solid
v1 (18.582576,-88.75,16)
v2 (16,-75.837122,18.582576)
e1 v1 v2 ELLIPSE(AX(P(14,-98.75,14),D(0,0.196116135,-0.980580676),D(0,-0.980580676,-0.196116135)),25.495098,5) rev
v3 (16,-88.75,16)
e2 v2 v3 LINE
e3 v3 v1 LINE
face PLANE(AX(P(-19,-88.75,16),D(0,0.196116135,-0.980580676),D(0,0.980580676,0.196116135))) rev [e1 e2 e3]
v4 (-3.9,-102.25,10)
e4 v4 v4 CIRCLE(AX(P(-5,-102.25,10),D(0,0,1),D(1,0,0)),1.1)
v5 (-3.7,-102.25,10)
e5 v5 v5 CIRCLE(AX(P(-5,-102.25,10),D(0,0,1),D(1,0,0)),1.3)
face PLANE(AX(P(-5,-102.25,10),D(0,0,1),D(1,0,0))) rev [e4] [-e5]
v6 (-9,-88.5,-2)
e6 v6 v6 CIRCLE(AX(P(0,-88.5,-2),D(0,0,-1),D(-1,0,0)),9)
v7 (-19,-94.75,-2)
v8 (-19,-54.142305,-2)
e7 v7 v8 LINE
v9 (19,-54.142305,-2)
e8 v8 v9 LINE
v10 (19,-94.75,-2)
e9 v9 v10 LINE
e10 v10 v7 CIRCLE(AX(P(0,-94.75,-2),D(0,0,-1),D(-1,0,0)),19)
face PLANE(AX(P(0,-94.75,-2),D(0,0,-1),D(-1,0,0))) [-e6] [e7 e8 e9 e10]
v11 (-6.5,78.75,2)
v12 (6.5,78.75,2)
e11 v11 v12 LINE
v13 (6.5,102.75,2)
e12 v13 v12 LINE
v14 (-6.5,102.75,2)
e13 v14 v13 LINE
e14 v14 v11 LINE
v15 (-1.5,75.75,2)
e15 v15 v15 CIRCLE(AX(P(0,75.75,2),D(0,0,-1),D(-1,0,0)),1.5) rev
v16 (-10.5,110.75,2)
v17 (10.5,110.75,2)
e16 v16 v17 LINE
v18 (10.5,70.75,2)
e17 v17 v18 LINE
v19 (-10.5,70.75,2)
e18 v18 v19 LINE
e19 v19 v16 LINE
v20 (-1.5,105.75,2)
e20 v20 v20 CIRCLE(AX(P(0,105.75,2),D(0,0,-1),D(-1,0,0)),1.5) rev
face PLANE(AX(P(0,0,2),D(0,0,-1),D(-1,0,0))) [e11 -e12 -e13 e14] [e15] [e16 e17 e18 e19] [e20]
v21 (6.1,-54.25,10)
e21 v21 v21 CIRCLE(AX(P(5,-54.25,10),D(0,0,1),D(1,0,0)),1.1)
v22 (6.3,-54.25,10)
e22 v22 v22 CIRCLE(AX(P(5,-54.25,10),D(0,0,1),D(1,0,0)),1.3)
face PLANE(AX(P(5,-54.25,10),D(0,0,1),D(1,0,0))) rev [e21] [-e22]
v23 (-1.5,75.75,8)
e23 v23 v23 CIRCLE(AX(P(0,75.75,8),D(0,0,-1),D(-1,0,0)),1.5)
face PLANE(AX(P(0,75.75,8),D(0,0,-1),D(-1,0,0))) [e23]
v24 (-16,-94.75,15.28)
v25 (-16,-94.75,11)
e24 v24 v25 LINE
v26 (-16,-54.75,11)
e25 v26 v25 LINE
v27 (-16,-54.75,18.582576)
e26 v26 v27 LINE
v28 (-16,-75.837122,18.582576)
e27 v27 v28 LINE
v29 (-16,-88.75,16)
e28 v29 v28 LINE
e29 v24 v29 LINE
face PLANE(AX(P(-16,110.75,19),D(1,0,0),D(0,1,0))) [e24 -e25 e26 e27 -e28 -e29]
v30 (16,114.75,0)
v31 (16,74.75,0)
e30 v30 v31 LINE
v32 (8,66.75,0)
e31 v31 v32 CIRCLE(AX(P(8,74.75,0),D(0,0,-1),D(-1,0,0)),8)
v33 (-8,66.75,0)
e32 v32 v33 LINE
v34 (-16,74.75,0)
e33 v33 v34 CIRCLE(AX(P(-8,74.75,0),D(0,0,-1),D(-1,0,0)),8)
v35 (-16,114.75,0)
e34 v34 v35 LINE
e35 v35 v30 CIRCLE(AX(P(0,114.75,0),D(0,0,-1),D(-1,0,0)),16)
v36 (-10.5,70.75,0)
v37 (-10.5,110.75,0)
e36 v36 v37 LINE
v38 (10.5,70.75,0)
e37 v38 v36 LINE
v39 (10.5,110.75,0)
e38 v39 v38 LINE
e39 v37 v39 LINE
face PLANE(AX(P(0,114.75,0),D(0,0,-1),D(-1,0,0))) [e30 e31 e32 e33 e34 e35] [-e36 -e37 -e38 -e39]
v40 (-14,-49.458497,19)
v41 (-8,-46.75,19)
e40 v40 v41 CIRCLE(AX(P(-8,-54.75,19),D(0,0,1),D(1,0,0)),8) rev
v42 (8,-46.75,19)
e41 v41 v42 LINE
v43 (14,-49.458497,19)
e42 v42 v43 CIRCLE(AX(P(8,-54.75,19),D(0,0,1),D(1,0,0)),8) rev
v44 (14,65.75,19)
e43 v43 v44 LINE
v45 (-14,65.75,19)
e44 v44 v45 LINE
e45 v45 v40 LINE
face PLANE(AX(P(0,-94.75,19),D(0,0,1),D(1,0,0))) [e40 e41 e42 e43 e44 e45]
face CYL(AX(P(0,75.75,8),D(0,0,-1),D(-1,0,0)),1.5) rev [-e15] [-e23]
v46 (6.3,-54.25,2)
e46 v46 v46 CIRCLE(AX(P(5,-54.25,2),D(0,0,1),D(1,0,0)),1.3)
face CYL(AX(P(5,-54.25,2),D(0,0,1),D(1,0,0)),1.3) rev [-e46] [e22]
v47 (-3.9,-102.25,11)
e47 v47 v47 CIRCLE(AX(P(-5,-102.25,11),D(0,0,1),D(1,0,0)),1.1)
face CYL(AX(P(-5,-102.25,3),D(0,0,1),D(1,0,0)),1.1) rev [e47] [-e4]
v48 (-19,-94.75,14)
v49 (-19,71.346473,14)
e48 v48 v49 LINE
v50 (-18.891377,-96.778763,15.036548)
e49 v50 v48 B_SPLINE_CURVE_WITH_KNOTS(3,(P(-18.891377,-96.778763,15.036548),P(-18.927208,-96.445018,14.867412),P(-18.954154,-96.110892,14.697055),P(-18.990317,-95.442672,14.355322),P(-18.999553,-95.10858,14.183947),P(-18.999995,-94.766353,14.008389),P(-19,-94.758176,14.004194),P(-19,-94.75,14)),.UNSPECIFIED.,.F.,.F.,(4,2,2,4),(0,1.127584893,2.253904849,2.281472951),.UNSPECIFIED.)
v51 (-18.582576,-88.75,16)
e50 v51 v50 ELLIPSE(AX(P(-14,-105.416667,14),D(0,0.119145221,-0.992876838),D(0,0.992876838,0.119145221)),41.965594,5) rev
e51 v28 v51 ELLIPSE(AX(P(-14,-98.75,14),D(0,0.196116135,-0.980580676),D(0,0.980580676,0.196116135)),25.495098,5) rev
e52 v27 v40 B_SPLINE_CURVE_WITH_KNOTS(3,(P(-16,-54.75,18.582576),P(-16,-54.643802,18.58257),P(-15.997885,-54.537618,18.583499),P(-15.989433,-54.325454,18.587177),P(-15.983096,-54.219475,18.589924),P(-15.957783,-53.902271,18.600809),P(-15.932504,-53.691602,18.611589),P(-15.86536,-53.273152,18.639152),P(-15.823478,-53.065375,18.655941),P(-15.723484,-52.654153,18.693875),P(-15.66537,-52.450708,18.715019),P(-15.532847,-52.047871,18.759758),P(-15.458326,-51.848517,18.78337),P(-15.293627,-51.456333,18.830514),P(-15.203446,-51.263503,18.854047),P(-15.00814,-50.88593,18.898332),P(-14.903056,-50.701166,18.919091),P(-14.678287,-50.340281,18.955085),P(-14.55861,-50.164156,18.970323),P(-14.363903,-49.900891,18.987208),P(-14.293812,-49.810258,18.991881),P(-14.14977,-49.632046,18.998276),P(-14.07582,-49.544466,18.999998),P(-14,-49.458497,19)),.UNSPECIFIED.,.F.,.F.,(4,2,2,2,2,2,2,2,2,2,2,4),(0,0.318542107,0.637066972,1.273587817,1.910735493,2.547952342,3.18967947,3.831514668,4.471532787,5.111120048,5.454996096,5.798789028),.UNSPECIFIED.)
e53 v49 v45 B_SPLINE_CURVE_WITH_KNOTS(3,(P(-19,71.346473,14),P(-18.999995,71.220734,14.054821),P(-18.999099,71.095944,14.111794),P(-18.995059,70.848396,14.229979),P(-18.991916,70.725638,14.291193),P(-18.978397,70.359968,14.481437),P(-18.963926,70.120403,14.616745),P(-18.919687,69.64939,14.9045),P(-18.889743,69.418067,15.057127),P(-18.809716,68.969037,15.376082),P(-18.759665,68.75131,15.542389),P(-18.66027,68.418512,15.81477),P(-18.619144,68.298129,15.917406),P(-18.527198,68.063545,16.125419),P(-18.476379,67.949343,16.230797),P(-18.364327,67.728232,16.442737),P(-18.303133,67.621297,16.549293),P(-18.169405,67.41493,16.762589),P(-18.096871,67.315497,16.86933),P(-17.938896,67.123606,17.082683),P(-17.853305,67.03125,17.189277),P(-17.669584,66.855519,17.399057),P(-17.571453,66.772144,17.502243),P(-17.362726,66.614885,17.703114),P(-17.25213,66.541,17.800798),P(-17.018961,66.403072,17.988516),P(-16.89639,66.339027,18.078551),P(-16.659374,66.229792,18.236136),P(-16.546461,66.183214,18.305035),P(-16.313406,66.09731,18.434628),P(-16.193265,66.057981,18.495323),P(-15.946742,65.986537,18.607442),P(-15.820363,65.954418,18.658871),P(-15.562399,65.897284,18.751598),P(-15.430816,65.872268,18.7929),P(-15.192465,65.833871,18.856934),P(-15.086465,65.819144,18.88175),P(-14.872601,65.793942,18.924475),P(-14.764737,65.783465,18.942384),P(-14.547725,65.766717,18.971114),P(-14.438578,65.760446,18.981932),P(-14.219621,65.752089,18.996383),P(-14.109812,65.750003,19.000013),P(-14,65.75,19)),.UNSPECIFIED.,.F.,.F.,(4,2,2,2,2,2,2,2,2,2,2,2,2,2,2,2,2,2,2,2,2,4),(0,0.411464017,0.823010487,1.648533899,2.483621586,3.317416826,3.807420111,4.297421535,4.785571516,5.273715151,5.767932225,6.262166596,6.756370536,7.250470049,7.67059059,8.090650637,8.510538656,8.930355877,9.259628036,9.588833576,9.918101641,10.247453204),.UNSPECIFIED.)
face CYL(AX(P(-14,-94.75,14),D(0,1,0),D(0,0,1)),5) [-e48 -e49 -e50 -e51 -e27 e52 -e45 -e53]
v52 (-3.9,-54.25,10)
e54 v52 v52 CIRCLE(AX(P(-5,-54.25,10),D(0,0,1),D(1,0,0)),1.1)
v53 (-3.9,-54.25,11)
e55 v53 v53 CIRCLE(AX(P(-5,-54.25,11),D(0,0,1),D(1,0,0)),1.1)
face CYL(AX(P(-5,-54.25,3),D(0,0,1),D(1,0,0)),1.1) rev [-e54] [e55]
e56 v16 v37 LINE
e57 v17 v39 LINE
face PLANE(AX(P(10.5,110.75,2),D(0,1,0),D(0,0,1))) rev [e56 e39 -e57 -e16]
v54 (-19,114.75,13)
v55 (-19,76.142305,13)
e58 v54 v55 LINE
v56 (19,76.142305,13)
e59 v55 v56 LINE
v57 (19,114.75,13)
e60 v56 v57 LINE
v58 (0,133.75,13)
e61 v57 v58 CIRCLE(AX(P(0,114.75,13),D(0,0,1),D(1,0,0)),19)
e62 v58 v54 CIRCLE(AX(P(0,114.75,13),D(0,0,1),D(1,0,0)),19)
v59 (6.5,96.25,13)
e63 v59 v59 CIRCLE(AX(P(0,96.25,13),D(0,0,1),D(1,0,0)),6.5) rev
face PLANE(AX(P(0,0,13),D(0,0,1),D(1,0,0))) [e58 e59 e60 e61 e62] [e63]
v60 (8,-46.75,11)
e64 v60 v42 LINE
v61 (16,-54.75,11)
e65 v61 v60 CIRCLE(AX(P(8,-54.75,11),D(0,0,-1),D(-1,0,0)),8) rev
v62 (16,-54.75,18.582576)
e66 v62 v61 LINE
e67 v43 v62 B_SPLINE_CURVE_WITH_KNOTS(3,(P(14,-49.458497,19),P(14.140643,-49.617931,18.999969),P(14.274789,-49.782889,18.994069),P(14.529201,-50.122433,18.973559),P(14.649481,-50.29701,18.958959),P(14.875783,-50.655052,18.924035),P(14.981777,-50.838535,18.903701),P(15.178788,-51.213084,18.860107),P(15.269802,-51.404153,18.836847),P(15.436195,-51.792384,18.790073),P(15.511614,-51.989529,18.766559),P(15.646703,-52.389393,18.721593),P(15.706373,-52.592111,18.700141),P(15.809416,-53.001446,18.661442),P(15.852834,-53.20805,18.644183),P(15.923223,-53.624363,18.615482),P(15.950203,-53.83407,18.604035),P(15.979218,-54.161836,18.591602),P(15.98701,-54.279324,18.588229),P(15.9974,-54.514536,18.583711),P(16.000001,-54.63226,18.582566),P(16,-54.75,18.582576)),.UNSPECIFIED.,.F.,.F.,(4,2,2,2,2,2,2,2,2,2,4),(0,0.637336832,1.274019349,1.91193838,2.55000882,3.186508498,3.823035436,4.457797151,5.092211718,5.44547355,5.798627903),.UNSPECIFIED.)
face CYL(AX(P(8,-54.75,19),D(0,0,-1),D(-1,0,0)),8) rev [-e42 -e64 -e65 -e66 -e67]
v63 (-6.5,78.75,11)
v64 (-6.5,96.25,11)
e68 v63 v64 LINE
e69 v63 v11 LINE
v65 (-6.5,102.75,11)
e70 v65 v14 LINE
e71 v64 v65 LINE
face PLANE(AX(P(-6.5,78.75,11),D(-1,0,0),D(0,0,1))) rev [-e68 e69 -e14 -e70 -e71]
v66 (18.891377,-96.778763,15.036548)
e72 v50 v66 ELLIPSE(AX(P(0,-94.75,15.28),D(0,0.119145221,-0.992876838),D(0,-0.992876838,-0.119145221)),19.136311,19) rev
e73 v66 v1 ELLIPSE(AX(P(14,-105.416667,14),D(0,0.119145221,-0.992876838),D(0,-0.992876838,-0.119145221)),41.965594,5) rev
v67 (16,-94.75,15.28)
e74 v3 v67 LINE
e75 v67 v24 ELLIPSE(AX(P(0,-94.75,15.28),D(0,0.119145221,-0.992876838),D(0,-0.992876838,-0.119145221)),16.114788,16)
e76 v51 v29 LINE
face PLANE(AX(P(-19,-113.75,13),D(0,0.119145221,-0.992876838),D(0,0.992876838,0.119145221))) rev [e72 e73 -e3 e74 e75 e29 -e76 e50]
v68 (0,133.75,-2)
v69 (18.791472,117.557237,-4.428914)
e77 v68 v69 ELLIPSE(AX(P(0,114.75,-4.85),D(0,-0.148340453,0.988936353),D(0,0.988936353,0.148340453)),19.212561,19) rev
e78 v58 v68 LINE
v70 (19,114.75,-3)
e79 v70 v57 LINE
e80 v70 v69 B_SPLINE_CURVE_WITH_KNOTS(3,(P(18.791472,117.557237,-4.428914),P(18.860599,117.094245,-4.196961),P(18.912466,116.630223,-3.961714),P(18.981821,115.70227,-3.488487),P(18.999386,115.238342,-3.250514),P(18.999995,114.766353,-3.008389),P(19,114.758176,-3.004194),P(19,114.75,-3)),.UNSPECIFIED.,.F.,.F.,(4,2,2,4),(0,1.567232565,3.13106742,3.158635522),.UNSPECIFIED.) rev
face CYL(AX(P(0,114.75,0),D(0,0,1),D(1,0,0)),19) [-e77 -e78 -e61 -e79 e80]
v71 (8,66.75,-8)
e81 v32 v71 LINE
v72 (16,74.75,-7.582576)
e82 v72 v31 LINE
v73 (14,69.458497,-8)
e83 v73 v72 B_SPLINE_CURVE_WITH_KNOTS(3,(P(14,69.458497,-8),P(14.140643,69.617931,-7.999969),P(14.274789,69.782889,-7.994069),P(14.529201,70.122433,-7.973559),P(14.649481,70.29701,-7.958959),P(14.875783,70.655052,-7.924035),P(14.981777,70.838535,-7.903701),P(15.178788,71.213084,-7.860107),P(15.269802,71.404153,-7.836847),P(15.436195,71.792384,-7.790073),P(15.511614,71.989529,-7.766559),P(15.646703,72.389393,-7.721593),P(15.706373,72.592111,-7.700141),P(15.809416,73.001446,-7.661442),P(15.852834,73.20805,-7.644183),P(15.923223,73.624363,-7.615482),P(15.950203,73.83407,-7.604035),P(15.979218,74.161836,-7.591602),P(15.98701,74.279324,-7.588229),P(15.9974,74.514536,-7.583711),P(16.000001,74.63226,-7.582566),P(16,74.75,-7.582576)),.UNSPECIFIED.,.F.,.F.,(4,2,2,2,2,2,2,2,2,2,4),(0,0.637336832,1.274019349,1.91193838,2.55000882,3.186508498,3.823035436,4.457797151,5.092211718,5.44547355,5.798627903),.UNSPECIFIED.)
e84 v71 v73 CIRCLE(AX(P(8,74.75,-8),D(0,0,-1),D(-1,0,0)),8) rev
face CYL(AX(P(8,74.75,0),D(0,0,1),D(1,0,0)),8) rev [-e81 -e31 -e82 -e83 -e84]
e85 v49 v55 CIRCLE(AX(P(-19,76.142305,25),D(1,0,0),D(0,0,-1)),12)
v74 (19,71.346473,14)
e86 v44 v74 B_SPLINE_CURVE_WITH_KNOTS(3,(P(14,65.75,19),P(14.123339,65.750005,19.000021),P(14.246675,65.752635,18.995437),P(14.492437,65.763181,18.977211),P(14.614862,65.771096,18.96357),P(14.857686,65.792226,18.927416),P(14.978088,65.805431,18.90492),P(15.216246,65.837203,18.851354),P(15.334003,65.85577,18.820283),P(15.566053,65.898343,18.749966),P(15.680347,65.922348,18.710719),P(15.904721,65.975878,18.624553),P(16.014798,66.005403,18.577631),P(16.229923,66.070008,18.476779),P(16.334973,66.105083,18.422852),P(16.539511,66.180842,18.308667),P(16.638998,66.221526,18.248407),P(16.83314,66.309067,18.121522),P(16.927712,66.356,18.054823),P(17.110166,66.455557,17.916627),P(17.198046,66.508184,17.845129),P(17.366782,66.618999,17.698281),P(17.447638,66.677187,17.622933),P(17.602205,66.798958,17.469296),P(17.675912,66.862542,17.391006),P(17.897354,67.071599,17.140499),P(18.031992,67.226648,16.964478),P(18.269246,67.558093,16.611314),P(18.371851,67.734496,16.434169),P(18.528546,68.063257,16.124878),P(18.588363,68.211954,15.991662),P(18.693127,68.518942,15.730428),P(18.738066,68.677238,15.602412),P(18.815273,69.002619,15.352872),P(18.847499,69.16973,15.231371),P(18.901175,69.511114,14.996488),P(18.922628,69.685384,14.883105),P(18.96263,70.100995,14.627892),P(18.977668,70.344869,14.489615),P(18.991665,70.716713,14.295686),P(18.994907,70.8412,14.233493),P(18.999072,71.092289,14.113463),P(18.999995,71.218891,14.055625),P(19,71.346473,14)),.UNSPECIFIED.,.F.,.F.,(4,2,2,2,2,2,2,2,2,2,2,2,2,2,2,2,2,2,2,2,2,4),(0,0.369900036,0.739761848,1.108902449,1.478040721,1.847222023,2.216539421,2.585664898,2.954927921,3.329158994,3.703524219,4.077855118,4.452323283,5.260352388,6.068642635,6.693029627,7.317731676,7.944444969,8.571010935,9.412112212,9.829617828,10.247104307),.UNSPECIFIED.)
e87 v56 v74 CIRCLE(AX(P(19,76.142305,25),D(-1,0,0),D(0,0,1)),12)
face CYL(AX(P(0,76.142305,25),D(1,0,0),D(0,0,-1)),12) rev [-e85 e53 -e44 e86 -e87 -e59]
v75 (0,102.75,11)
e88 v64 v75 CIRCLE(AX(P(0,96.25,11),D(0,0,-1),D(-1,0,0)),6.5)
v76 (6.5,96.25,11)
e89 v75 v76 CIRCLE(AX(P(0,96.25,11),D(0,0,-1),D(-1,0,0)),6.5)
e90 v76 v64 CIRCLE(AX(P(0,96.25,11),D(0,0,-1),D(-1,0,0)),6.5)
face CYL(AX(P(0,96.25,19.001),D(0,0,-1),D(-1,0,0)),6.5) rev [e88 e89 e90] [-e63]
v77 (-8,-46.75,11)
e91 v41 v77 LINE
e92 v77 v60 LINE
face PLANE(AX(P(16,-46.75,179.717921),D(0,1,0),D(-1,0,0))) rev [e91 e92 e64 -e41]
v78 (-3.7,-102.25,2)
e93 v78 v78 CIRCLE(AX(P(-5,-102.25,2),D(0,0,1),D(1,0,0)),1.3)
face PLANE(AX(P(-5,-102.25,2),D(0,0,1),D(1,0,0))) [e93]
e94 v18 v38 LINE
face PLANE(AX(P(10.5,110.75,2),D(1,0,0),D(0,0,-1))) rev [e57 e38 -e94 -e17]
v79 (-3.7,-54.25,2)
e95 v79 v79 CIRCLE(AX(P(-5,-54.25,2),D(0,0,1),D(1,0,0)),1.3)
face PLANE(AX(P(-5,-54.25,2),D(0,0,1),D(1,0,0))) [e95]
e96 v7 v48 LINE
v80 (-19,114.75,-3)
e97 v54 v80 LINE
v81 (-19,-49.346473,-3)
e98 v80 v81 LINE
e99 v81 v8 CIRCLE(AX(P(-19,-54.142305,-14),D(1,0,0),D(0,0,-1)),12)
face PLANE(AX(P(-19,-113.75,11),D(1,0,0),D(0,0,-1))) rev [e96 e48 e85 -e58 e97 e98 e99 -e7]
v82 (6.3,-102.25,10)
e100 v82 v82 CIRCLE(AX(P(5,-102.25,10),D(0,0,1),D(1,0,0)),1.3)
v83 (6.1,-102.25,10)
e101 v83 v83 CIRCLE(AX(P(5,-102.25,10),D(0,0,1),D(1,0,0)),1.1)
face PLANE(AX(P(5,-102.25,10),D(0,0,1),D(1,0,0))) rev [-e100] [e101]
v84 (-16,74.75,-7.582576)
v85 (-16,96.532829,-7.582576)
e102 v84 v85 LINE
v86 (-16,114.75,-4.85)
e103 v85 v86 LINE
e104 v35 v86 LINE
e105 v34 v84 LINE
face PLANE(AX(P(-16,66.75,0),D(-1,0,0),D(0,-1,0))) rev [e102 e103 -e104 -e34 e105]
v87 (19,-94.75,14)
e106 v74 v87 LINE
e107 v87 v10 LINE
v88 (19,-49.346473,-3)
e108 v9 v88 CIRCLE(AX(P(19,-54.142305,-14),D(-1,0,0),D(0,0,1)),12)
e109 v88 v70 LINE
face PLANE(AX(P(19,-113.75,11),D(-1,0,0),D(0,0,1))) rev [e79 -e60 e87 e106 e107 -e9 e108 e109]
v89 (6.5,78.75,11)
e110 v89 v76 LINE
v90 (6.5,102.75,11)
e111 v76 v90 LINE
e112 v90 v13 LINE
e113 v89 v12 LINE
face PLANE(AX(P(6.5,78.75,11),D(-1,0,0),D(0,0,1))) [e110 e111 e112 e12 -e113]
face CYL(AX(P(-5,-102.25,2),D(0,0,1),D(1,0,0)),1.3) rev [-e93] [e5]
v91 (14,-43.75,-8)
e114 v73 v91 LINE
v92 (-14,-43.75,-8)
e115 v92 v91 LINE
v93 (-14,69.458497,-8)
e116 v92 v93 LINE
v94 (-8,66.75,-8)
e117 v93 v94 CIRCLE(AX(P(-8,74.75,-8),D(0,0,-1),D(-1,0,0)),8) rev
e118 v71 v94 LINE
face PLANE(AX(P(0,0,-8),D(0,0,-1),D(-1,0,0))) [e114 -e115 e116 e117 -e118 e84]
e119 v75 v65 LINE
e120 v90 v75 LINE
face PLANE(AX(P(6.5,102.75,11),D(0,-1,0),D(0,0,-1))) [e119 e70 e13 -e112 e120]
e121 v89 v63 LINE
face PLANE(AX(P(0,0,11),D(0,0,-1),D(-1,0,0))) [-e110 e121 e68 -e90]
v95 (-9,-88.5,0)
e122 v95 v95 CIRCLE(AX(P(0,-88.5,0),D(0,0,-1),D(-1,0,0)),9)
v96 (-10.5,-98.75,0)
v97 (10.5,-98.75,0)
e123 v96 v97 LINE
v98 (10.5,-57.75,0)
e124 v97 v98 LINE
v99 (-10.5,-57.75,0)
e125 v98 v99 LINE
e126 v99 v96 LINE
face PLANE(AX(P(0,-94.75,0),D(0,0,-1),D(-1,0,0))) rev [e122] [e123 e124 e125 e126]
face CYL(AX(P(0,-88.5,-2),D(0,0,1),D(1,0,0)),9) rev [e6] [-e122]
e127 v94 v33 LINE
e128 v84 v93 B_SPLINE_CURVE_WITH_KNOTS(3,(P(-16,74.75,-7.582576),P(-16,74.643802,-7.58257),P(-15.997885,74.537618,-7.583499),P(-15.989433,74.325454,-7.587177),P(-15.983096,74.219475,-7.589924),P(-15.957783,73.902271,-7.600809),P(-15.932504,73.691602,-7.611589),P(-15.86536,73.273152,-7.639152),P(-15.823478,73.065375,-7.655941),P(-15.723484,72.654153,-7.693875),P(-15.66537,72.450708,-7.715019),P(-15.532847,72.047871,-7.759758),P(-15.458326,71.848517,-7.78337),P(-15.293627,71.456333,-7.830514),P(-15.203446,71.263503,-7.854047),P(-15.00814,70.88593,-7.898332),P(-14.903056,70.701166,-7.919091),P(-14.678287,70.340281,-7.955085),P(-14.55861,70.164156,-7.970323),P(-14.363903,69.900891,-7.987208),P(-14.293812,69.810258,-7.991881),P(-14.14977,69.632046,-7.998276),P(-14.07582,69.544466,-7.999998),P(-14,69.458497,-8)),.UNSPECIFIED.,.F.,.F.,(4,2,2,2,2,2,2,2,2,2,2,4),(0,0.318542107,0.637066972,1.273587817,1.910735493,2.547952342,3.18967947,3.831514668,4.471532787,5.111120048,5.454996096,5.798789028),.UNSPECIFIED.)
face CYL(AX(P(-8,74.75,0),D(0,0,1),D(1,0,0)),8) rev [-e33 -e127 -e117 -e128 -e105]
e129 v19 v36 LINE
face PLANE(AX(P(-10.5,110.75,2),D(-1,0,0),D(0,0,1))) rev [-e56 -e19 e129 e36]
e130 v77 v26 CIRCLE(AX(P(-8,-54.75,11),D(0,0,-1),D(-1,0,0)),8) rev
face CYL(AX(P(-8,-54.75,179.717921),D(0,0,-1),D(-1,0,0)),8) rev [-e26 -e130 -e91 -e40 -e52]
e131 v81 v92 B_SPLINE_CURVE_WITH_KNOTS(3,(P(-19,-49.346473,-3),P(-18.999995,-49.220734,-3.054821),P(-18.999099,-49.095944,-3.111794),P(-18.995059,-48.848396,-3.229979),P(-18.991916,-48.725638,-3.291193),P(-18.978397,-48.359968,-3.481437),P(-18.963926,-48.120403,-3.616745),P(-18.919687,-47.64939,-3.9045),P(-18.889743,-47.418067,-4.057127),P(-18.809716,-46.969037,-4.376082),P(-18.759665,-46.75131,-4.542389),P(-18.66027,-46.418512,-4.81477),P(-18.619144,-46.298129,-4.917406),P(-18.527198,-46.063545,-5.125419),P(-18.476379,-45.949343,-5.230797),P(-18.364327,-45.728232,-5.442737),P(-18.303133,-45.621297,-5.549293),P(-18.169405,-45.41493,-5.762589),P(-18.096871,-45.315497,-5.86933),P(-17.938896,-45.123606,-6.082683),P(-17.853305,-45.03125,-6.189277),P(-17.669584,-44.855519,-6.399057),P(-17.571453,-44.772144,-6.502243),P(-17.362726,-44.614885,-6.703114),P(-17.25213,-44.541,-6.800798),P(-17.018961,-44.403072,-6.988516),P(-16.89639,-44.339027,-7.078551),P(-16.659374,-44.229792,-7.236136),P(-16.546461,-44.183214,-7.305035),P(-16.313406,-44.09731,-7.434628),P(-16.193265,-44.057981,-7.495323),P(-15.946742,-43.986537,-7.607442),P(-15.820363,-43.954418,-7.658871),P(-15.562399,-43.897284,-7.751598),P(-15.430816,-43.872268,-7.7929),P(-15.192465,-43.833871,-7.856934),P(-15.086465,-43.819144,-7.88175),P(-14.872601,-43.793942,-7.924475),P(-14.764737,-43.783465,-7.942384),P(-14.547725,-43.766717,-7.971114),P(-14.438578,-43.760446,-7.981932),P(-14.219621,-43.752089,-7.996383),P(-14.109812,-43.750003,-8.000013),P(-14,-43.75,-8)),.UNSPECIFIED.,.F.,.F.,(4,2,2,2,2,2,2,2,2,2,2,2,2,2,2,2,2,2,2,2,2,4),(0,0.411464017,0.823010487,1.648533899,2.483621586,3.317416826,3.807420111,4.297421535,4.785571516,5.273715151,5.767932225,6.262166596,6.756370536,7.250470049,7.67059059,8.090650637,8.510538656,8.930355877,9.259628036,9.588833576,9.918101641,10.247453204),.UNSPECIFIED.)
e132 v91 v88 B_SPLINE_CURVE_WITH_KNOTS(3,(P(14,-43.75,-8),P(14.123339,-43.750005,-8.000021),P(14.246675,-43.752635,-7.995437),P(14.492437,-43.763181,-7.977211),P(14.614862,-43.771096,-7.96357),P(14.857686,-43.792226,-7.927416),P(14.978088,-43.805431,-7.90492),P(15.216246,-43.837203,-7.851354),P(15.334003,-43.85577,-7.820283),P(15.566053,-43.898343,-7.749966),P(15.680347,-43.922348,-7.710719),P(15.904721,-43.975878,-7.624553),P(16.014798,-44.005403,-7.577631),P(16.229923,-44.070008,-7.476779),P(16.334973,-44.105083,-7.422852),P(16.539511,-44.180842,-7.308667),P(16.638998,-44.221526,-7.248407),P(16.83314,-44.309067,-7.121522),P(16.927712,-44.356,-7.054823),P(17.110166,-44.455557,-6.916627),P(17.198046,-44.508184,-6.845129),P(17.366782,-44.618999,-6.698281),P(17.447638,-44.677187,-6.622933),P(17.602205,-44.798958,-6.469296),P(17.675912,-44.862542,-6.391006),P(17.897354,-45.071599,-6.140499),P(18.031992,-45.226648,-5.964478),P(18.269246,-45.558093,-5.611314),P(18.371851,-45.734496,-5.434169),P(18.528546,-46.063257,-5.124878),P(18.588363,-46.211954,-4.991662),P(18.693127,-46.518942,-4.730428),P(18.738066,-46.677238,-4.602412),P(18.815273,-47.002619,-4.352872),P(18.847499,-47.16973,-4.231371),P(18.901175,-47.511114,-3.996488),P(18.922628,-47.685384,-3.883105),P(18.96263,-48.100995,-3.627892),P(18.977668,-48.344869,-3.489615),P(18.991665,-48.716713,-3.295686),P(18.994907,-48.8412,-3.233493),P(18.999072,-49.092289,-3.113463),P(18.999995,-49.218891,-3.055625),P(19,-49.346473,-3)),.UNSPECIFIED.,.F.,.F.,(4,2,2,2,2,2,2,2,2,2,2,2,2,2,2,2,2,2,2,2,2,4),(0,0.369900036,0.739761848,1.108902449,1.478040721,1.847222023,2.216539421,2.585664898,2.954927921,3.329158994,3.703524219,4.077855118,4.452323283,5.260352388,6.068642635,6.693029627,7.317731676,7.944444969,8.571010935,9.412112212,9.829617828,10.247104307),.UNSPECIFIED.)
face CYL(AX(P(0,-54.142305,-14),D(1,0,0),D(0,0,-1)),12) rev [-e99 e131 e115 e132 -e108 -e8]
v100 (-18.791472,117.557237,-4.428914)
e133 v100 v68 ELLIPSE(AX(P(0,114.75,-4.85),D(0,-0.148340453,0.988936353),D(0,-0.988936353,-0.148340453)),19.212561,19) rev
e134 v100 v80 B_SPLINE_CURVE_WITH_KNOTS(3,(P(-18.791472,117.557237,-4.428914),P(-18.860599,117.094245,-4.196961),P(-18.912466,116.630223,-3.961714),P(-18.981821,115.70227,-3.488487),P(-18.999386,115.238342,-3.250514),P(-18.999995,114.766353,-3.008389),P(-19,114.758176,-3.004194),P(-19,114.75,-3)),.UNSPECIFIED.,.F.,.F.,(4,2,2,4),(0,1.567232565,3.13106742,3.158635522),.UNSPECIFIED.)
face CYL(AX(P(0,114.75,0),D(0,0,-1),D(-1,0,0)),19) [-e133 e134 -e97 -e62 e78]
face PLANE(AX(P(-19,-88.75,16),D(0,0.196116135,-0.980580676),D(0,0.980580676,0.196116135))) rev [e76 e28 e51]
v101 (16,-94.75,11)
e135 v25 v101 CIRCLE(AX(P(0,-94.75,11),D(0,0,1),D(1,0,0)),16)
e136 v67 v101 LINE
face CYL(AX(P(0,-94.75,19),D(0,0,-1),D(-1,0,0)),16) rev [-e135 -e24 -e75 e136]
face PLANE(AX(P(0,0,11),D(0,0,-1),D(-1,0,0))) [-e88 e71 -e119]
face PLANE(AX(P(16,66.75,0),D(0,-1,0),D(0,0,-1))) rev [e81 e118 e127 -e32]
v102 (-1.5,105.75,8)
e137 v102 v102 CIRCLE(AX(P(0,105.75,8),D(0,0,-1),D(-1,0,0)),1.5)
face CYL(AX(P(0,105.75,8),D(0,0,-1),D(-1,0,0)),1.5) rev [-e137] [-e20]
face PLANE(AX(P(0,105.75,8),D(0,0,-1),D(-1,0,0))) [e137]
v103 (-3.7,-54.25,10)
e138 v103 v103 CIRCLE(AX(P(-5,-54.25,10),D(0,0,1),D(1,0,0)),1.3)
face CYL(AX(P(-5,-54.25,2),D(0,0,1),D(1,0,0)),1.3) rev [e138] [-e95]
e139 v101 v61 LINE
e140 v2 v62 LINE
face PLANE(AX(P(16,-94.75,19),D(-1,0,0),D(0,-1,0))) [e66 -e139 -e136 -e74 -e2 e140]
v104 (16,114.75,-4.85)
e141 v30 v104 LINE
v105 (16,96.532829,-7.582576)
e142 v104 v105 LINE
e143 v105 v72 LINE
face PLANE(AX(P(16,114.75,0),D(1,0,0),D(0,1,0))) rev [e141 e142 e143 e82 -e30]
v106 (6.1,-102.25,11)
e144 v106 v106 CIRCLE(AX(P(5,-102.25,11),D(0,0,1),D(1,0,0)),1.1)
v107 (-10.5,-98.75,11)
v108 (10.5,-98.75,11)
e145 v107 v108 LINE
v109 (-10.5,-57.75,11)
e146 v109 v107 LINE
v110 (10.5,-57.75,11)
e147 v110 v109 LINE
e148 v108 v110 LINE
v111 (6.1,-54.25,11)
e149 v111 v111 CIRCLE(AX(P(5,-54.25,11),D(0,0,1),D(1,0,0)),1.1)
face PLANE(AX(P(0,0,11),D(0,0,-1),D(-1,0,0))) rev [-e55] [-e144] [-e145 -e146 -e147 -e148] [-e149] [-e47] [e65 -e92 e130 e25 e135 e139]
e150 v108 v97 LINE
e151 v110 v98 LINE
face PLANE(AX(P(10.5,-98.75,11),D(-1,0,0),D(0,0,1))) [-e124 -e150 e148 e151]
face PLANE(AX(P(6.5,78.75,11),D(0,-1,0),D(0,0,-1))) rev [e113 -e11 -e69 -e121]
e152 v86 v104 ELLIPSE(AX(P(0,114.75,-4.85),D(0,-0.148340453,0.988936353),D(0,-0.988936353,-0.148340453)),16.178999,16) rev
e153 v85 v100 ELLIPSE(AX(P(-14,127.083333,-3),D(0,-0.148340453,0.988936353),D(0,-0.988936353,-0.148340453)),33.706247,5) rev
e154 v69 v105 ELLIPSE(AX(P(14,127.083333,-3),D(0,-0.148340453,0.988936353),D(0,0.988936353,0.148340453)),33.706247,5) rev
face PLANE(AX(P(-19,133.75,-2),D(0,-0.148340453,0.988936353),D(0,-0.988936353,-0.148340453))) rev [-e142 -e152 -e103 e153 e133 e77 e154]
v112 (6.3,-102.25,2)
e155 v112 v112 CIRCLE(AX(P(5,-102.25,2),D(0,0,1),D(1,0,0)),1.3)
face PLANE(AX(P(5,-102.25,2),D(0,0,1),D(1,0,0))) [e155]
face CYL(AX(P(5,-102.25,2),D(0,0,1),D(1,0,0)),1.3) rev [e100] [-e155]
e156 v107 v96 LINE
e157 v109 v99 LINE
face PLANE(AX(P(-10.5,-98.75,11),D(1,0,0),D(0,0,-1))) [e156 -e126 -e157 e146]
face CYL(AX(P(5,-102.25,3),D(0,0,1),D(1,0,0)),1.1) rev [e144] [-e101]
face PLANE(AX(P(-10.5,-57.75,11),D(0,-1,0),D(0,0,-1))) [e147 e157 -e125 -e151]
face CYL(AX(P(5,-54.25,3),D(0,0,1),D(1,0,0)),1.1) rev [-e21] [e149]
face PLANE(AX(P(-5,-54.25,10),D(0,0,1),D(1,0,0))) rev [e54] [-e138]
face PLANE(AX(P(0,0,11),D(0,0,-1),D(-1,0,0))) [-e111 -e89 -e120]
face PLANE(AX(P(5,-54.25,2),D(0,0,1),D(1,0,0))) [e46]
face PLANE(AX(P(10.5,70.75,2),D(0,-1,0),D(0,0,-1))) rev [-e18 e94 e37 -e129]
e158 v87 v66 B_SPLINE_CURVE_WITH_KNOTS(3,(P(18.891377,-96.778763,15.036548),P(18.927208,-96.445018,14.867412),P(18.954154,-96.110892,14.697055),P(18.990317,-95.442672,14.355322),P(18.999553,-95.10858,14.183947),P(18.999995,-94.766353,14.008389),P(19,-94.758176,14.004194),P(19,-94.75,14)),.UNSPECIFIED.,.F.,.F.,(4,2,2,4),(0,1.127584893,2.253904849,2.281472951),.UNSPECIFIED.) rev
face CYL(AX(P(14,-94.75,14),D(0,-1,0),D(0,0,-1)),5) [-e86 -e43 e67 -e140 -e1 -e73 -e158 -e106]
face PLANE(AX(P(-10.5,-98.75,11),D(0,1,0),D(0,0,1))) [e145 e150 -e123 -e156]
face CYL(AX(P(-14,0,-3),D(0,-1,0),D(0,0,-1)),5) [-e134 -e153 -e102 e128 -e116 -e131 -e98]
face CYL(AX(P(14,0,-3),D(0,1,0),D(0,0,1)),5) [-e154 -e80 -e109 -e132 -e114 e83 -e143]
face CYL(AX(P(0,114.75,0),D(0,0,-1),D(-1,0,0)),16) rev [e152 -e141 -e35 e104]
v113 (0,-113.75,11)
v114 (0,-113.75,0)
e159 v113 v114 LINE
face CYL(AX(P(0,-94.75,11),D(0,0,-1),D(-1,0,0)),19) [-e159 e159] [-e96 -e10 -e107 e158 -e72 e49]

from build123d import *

# Parameters (mm, degrees)
SKETCH1_W               = 38
SKETCH1_H               = 227.5
SKETCH1_W_2             = 21
SKETCH1_H_2             = 41
BOSS_EXTRUDE1_DEPTH     = 11
SKETCH3_R               = 1.3
CUT_EXTRUDE1_DEPTH      = 8
FILLET3_R               = 19
BOSS_EXTRUDE2_DEPTH     = 8
CUT_EXTRUDE2_DEPTH      = 117.880547997
CUT_EXTRUDE2_DEPTH_BACK = 117.880547997
SKETCH7_W               = 32
SKETCH7_H               = 157.5
BOSS_EXTRUDE4_DEPTH     = 8
SKETCH8_W               = 38
SKETCH8_H               = 157.5
BOSS_EXTRUDE5_DEPTH     = 8
BOSS_EXTRUDE10_START    = 2
SKETCH27_R              = 9
BOSS_EXTRUDE10_DEPTH    = 2
SKETCH28_W              = 38
SKETCH28_H              = 27
BOSS_EXTRUDE11_DEPTH    = 20
FILLET4_R               = 19
CUT_EXTRUDE14_DEPTH     = 8
SKETCH30_W              = 13
SKETCH30_H              = 24
CUT_EXTRUDE15_DEPTH     = 11
CUT_EXTRUDE16_REACH     = 138.422
SKETCH31_R              = 6.5
CUT_EXTRUDE17_START     = 65.75
CUT_EXTRUDE17_OUTLINE_W = 38
CUT_EXTRUDE17_OUTLINE_H = 6
CUT_EXTRUDE17_DEPTH     = 68
FILLET5_R               = 12
CUT_EXTRUDE18_DEPTH     = 141.335535414
FILLET7_R               = 5
SKETCH34_R              = 1.5
CUT_EXTRUDE19_DEPTH     = 8
SKETCH35_R              = 1.1
CUT_EXTRUDE20_DEPTH     = 8
FILLET8_R               = 8
SKETCH36_W              = 21
SKETCH36_H              = 40
CUT_EXTRUDE21_DEPTH     = 2


# Read off the part's stored shape, not the designer's step: Cut-Extrude17
# Some blends are built 0.0001 mm under size
with BuildPart() as part:
    # Sketch1 → Boss-Extrude1 (new body)
    with BuildSketch(Plane.XY):
        Rectangle(SKETCH1_W, SKETCH1_H)
        with Locations((0, -78.25)):
            Rectangle(SKETCH1_W_2, SKETCH1_H_2, mode=Mode.SUBTRACT)
    extrude(amount=BOSS_EXTRUDE1_DEPTH)

    # Sketch3 → Cut-Extrude1 (cut)
    with BuildSketch(Plane.XY.offset(10)):
        with Locations((-5, -54.25)):
            Circle(SKETCH3_R)
        with Locations((5, -54.25)):
            Circle(SKETCH3_R)
        with Locations((5, -102.25)):
            Circle(SKETCH3_R)
        with Locations((-5, -102.25)):
            Circle(SKETCH3_R)
    extrude(amount=-CUT_EXTRUDE1_DEPTH, mode=Mode.SUBTRACT)

    # Fillet3
    fillet3_edges = [part.edges().sort_by_distance(p)[0] for p in [
        (19, -113.75, 5.5),
        (-19, -113.75, 5.5),
    ]]
    fillet(fillet3_edges, radius=FILLET3_R - 0.0001)  # a hair under: the kernel refuses the full size

    # Sketch4 → Boss-Extrude2 (add)
    with BuildSketch(Plane.XY.offset(11)):
        with BuildLine():
            Line((19, -94.75), (19, 113.75))
            Line((19, 113.75), (-19, 113.75))
            Line((-19, 113.75), (-19, -94.75))
            ThreePointArc((-19, -94.75), (-13.435028843, -108.185028843), (0, -113.75))
            ThreePointArc((0, -113.75), (13.435028843, -108.185028843), (19, -94.75))
        make_face()
        with BuildLine():
            Line((16, -94.75), (16, 110.75))
            Line((16, 110.75), (-16, 110.75))
            Line((-16, 110.75), (-16, -94.75))
            ThreePointArc((-16, -94.75), (-11.313708499, -106.063708499), (0, -110.75))
            ThreePointArc((0, -110.75), (11.313708499, -106.063708499), (16, -94.75))
        make_face(mode=Mode.SUBTRACT)
    extrude(amount=BOSS_EXTRUDE2_DEPTH)

    # Sketch6 → Cut-Extrude2 (cut, two sides: drawn at the far end of the back side and taken through both)
    with BuildSketch(Plane(origin=(0, 0, 0), x_dir=(0, 0, -1), z_dir=(1, 0, 0)).offset(-CUT_EXTRUDE2_DEPTH_BACK)):
        Polygon((-13, -113.75), (-16, -88.75), (-19, -73.75), (-19, -113.75), align=None)
    extrude(amount=CUT_EXTRUDE2_DEPTH + CUT_EXTRUDE2_DEPTH_BACK, mode=Mode.SUBTRACT)

    # Sketch7 → Boss-Extrude4 (add)
    with BuildSketch(Plane.XY.offset(11)):
        with Locations((0, 32)):
            Rectangle(SKETCH7_W, SKETCH7_H)
    extrude(amount=BOSS_EXTRUDE4_DEPTH)

    # Sketch8 → Boss-Extrude5 (add)
    with BuildSketch(Plane(origin=(0, 0, 0), x_dir=(-1, 0, 0), z_dir=(0, 0, -1))):
        with Locations((0, 35)):
            Rectangle(SKETCH8_W, SKETCH8_H)
    extrude(amount=BOSS_EXTRUDE5_DEPTH)

    # Sketch27 → Boss-Extrude10 (add)
    with BuildSketch(Plane(origin=(0, 0, 0), x_dir=(-1, 0, 0), z_dir=(0, 0, -1)).offset(BOSS_EXTRUDE10_START)):
        with BuildLine():
            Line((19, -94.75), (19, -43.75))
            Line((19, -43.75), (-19, -43.75))
            Line((-19, -43.75), (-19, -94.75))
            ThreePointArc((-19, -94.75), (-13.435028843, -108.185028843), (0, -113.75))
            ThreePointArc((0, -113.75), (13.435028843, -108.185028843), (19, -94.75))
        make_face()
        with Locations((0, -88.5)):
            Circle(SKETCH27_R, mode=Mode.SUBTRACT)
    extrude(amount=-BOSS_EXTRUDE10_DEPTH)

    # Sketch28 → Boss-Extrude11 (add)
    with BuildSketch(Plane(origin=(0, 113.75, 0), x_dir=(1, 0, 0), z_dir=(0, 1, 0))):
        with Locations((0, -5.5)):
            Rectangle(SKETCH28_W, SKETCH28_H)
    extrude(amount=BOSS_EXTRUDE11_DEPTH)

    # Fillet4
    fillet4_edges = [part.edges().sort_by_distance(p)[0] for p in [
        (-19, 133.75, 5.5),
        (19, 133.75, 5.5),
    ]]
    fillet(fillet4_edges, radius=FILLET4_R - 0.0001)  # a hair under: the kernel refuses the full size

    # Sketch29 → Cut-Extrude14 (cut)
    with BuildSketch(Plane(origin=(0, 0, -8), x_dir=(-1, 0, 0), z_dir=(0, 0, -1))):
        with BuildLine():
            Line((16, 66.75), (16, 114.75))
            ThreePointArc((16, 114.75), (11.313708499, 126.063708499), (0, 130.75))
            ThreePointArc((0, 130.75), (-11.313708499, 126.063708499), (-16, 114.75))
            Line((-16, 114.75), (-16, 66.75))
            Line((-16, 66.75), (16, 66.75))
        make_face()
    extrude(amount=-CUT_EXTRUDE14_DEPTH, mode=Mode.SUBTRACT)

    # Sketch30 → Cut-Extrude15 (cut)
    with BuildSketch(Plane(origin=(0, 0, 0), x_dir=(-1, 0, 0), z_dir=(0, 0, -1))):
        with Locations((0, 90.75)):
            Rectangle(SKETCH30_W, SKETCH30_H)
    extrude(amount=-CUT_EXTRUDE15_DEPTH, mode=Mode.SUBTRACT)

    # Sketch31 → Cut-Extrude16 (cut, up to next)
    with BuildSketch(Plane(origin=(0, 0, 11), x_dir=(-1, 0, 0), z_dir=(0, 0, -1)), mode=Mode.PRIVATE) as cut_extrude16_sk1:
        with Locations(Location((0, 96.25, 0), (0, 0, 180))):
            Circle(SKETCH31_R)
    cut_extrude16_tool1 = extrude(cut_extrude16_sk1.sketch, amount=-CUT_EXTRUDE16_REACH, mode=Mode.PRIVATE) & part.part
    add(cut_extrude16_tool1.solids().sort_by_distance((0, 96.25, 11))[0], mode=Mode.SUBTRACT)

    # Cut-Extrude17 outline → Cut-Extrude17 (cut)
    with BuildSketch(Plane(origin=(0, 0, 0), x_dir=(1, 0, 0), z_dir=(0, 1, 0)).offset(CUT_EXTRUDE17_START)):
        with Locations((0, -16)):
            Rectangle(CUT_EXTRUDE17_OUTLINE_W, CUT_EXTRUDE17_OUTLINE_H)
    extrude(amount=CUT_EXTRUDE17_DEPTH, mode=Mode.SUBTRACT)

    # Fillet5
    # the kernel refuses this fillet: 12 mm, written as the material it adds along each edge
    with BuildSketch(Plane(origin=(-19, -43.75, -2), x_dir=(0, 0, -1), z_dir=(1, 0, 0))) as fillet5_piece_1:
        with BuildLine():
            CenterArc((12, -10.392304845), FILLET5_R, 120, 60)
            Line((0, -10.392304845), (-0.24, -10.392304845))
            Line((-0.24, -10.392304845), (-0.24, 0))
            Line((-0.24, 0), (0, 0.24))
            ThreePointArc((0, 0.24), (3, 0.24), (5.88, 0.207846097))
            Line((5.88, 0.207846097), (6, 0))
        make_face()
    extrude(amount=38)
    with BuildSketch(Plane(origin=(19, 65.75, 13), x_dir=(0, 0, 1), z_dir=(-1, 0, 0))) as fillet5_piece_2:
        with BuildLine():
            CenterArc((12, 10.392304845), FILLET5_R, 180, 60)
            Line((0, 10.392304845), (-0.24, 10.392304845))
            Line((-0.24, 10.392304845), (-0.24, 0))
            Line((-0.24, 0), (0, -0.24))
            ThreePointArc((0, -0.24), (3, -0.24), (5.88, -0.207846097))
            Line((5.88, -0.207846097), (6, 0))
        make_face()
    extrude(amount=38)

    # Sketch33 → Cut-Extrude18 (cut, through all)
    with BuildSketch(Plane(origin=(19, 0, 0), x_dir=(0, 0, -1), z_dir=(1, 0, 0))):
        Polygon((2, 133.75), (8, 93.75), (8, 133.75), align=None)
    extrude(amount=-CUT_EXTRUDE18_DEPTH, mode=Mode.SUBTRACT)

    # Fillet7
    # the kernel refuses this fillet: 5 mm, written as the material it takes off along each edge
    with BuildSketch(Plane(origin=(-19, 123.75, -8), x_dir=(0, 0, 1), z_dir=(0, -1, 0)), Plane(origin=(19, -73.75, -8), x_dir=(0, 0, 1), z_dir=(0, 1, 0))) as fillet7_piece_1:
        with BuildLine():
            CenterArc((FILLET7_R, -FILLET7_R), FILLET7_R, 90, 90)
            Line((0, -FILLET7_R), (-FILLET7_R * 0.02, -FILLET7_R))
            Line((-FILLET7_R * 0.02, -FILLET7_R), (-FILLET7_R * 0.02, FILLET7_R * 0.02))
            Line((-FILLET7_R * 0.02, FILLET7_R * 0.02), (FILLET7_R, FILLET7_R * 0.02))
            Line((FILLET7_R, FILLET7_R * 0.02), (FILLET7_R, 0))
        make_face()
    extrude(amount=197.5, mode=Mode.SUBTRACT)
    with BuildSketch(Plane(origin=(-19, -103.75, 19), x_dir=(1, 0, 0), z_dir=(0, 1, 0)), Plane(origin=(19, 95.75, 19), x_dir=(-1, 0, 0), z_dir=(0, -1, 0))) as fillet7_piece_2:
        with BuildLine():
            CenterArc((FILLET7_R, FILLET7_R), FILLET7_R, 180, 90)
            Line((0, FILLET7_R), (-FILLET7_R * 0.02, FILLET7_R))
            Line((-FILLET7_R * 0.02, FILLET7_R), (-FILLET7_R * 0.02, -FILLET7_R * 0.02))
            Line((-FILLET7_R * 0.02, -FILLET7_R * 0.02), (FILLET7_R, -FILLET7_R * 0.02))
            Line((FILLET7_R, -FILLET7_R * 0.02), (FILLET7_R, 0))
        make_face()
    extrude(amount=199.5, mode=Mode.SUBTRACT)

    # Sketch34 → Cut-Extrude19 (cut)
    with BuildSketch(Plane(origin=(0, 0, 0), x_dir=(-1, 0, 0), z_dir=(0, 0, -1))):
        with Locations((0, 105.75)):
            Circle(SKETCH34_R)
        with Locations((0, 75.75)):
            Circle(SKETCH34_R)
    extrude(amount=-CUT_EXTRUDE19_DEPTH, mode=Mode.SUBTRACT)

    # Sketch35 → Cut-Extrude20 (cut)
    with BuildSketch(Plane.XY.offset(11)):
        with Locations((-5, -54.25)):
            Circle(SKETCH35_R)
        with Locations((5, -54.25)):
            Circle(SKETCH35_R)
        with Locations((5, -102.25)):
            Circle(SKETCH35_R)
        with Locations((-5, -102.25)):
            Circle(SKETCH35_R)
    extrude(amount=-CUT_EXTRUDE20_DEPTH, mode=Mode.SUBTRACT)

    # Fillet8
    fillet8_edges = [part.edges().sort_by_distance(p)[0] for p in [
        (-16, -46.75, 14.791287847),
        (16, -46.75, 14.791287847),
        (16, 66.75, -3.791287847),
        (-16, 66.75, -3.791287847),
    ]]
    fillet(fillet8_edges, radius=FILLET8_R)

    # Sketch36 → Cut-Extrude21 (cut)
    with BuildSketch(Plane(origin=(0, 0, 0), x_dir=(-1, 0, 0), z_dir=(0, 0, -1))):
        with Locations((0, 90.75)):
            Rectangle(SKETCH36_W, SKETCH36_H)
    extrude(amount=-CUT_EXTRUDE21_DEPTH, mode=Mode.SUBTRACT)


solid = part.part
